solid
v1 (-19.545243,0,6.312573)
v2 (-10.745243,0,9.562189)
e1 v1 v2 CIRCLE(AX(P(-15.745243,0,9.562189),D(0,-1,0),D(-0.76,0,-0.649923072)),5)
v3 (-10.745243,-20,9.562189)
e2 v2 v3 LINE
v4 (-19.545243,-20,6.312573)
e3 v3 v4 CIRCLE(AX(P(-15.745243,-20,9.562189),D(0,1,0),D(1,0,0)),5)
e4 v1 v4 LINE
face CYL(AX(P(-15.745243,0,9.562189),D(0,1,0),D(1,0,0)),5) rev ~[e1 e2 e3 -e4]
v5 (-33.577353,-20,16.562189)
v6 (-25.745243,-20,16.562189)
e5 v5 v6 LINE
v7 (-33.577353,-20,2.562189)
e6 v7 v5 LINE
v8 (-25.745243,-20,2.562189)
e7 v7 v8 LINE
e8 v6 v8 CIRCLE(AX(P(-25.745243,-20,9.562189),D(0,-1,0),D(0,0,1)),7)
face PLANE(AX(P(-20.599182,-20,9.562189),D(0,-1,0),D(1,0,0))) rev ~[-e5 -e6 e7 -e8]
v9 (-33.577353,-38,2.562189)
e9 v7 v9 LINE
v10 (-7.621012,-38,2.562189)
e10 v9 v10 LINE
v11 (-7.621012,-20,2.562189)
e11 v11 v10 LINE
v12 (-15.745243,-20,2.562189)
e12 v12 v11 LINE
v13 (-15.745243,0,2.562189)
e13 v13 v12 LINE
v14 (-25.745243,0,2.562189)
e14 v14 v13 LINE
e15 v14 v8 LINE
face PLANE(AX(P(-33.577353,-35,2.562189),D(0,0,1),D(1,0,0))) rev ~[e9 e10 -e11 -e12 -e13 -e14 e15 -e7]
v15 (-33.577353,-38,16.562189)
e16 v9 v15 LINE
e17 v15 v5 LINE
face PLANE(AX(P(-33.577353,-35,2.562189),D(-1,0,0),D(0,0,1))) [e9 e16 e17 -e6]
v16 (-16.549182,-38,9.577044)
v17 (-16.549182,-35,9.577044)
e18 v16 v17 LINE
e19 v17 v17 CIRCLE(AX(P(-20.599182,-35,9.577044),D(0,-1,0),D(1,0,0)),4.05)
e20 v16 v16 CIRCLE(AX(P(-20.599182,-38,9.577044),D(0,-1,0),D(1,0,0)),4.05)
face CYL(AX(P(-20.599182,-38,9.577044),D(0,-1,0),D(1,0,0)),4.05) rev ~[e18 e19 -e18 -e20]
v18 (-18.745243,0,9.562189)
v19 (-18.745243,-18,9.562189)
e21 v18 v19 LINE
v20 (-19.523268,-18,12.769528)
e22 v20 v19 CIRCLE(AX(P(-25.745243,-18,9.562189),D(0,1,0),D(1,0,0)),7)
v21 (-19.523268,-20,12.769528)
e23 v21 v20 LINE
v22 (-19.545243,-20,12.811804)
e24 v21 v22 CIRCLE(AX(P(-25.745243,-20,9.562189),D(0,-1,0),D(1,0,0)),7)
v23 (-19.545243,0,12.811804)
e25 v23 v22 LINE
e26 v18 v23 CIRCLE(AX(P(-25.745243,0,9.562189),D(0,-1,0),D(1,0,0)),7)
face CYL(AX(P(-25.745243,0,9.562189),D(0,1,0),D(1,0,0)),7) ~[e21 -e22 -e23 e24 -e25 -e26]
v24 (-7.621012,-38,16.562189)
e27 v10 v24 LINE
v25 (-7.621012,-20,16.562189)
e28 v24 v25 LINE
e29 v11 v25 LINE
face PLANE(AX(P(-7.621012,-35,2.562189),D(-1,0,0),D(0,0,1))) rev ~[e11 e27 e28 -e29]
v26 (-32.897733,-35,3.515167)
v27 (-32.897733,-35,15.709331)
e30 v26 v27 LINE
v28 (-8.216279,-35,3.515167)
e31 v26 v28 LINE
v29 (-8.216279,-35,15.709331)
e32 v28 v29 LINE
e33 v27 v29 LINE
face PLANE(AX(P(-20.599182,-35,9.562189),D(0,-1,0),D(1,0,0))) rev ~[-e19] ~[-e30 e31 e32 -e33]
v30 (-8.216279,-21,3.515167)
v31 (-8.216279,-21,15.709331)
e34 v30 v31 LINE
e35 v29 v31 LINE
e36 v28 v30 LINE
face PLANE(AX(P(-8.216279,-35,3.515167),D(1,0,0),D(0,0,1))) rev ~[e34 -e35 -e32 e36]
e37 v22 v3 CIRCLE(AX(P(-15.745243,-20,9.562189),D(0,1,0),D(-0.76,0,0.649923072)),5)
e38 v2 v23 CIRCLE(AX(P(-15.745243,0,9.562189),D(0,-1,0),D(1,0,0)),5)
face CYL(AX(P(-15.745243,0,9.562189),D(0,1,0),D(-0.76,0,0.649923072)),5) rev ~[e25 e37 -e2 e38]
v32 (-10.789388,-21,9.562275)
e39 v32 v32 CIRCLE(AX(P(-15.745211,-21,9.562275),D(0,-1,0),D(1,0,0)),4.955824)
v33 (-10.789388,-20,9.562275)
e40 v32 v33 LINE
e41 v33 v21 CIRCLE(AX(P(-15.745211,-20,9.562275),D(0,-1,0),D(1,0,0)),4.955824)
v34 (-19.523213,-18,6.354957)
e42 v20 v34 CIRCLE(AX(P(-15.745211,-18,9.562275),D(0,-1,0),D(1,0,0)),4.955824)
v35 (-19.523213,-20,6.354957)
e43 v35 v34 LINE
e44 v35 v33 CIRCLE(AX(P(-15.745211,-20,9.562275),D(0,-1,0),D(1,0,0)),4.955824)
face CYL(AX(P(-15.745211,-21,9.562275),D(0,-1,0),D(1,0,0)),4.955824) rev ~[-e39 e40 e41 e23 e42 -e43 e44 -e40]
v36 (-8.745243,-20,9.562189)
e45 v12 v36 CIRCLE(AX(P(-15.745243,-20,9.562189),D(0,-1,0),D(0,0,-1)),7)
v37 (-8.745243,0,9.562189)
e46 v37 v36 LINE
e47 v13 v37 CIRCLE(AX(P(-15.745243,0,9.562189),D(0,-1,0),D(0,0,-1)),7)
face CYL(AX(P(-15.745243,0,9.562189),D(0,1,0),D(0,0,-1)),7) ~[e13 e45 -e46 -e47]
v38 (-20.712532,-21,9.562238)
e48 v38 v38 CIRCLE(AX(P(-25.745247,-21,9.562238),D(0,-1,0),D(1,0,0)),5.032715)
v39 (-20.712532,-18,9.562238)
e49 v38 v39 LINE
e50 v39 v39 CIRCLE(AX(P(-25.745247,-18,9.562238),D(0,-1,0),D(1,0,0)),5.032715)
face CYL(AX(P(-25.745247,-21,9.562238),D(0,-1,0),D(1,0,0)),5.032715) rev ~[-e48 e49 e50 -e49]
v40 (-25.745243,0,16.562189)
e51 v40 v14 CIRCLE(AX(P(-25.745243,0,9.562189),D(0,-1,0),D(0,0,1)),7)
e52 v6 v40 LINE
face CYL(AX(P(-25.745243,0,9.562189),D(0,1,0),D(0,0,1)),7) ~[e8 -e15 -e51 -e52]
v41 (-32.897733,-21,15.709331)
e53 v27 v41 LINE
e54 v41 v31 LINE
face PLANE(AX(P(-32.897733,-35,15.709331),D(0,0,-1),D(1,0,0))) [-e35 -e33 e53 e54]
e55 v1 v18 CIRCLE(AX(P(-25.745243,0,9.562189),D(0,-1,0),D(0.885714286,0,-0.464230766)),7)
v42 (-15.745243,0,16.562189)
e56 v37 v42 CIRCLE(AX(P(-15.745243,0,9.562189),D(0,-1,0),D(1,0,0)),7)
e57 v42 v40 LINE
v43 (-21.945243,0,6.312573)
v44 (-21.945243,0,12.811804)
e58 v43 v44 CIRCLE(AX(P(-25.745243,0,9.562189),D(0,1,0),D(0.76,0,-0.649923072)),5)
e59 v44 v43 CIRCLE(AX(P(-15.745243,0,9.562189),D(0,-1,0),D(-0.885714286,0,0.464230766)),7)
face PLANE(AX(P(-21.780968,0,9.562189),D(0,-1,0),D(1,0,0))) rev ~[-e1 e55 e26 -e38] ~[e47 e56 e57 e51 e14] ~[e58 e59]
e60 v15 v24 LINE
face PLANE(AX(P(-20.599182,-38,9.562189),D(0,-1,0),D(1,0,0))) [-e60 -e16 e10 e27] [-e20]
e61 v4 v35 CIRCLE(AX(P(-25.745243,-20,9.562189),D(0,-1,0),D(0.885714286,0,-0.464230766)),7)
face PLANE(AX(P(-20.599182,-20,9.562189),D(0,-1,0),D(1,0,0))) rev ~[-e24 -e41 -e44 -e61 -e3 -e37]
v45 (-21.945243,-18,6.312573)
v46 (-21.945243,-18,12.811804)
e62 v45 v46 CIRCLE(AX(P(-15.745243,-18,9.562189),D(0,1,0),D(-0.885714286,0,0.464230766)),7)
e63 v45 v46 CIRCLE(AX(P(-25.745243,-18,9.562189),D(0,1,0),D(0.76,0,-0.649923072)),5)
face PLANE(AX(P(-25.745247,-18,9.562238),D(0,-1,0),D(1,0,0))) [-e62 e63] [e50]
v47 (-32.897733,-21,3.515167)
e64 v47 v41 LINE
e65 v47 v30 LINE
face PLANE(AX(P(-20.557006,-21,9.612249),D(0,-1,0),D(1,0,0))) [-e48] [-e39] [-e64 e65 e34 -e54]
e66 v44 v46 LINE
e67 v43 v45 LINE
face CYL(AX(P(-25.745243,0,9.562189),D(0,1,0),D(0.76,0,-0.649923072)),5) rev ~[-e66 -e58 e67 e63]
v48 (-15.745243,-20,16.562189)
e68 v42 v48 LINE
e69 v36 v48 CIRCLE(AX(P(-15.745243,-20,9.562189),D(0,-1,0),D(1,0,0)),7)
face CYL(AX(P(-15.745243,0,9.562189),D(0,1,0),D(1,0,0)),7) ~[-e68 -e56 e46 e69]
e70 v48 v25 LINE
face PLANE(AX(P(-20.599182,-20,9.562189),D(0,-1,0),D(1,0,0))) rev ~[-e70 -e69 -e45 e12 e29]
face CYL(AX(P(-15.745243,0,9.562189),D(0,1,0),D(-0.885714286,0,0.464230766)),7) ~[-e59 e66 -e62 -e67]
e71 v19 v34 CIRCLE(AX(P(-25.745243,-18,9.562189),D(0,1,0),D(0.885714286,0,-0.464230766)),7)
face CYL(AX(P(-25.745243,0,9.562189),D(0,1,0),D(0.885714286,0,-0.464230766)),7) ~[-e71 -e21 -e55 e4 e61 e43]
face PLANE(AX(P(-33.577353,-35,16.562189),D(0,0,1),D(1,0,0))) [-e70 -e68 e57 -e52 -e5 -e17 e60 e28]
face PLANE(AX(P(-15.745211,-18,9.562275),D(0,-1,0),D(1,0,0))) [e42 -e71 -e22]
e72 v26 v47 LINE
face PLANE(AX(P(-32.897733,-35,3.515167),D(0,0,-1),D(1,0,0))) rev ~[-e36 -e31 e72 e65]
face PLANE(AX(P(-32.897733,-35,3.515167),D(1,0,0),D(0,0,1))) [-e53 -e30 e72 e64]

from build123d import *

# Parameters (mm, degrees)
F1_DEPTH  = 13
F2_R      = 6.8523627272
F3_DEPTH  = 30
F4_DEPTH  = 20
F5_W      = 25.9563405998
F5_H      = 14
F6_DEPTH  = 15
F7_W      = 24.6814545244
F7_H      = 12.1941640973
F8_DEPTH  = 14
F9_R      = 5.0327145122
F9_R_2    = 4.9558235457
F10_DEPTH = 3
F11_W     = 25.9563405998
F11_H     = 14
F12_DEPTH = 3
F13_R     = 4.05
F14_DEPTH = 5


with BuildPart() as f1:
    # F0 (on Front) → F1 (new body)
    with BuildSketch(Plane.XZ):
        with BuildLine():
            ThreePointArc((-21.9452433995, 6.3125732282), (-30.7452433995, 9.5621885901), (-21.9452433995, 12.8118039519))
            ThreePointArc((-21.9452433995, 12.8118039519), (-21.4056409565, 13.6804284443), (-20.7452433995, 14.4611680756))
            ThreePointArc((-20.7452433995, 14.4611680756), (-23.0334963979, 16.0155929784), (-25.7452433995, 16.5621885901))
            ThreePointArc((-25.7452433995, 16.5621885901), (-32.7452433995, 9.5621885901), (-25.7452433995, 2.5621885901))
            ThreePointArc((-25.7452433995, 2.5621885901), (-23.0334963979, 3.1087842017), (-20.7452433995, 4.6632091045))
            ThreePointArc((-20.7452433995, 4.6632091045), (-21.4056409565, 5.4439487359), (-21.9452433995, 6.3125732282))
        make_face()
        with BuildLine():
            ThreePointArc((-20.7452433995, 14.4611680756), (-20.0848458425, 13.6804284443), (-19.5452433995, 12.8118039519))
            ThreePointArc((-19.5452433995, 12.8118039519), (-14.0131925919, 14.2526043499), (-10.7452433995, 9.5621885901))
            ThreePointArc((-10.7452433995, 9.5621885901), (-14.0131925919, 4.8717728303), (-19.5452433995, 6.3125732282))
            ThreePointArc((-19.5452433995, 6.3125732282), (-20.0848458425, 5.4439487359), (-20.7452433995, 4.6632091045))
            ThreePointArc((-20.7452433995, 4.6632091045), (-18.4569904011, 3.1087842017), (-15.7452433995, 2.5621885901))
            ThreePointArc((-15.7452433995, 2.5621885901), (-10.7954959312, 4.6124411218), (-8.7452433995, 9.5621885901))
            ThreePointArc((-8.7452433995, 9.5621885901), (-10.7954959312, 14.5119360584), (-15.7452433995, 16.5621885901))
            ThreePointArc((-15.7452433995, 16.5621885901), (-18.4569904011, 16.0155929784), (-20.7452433995, 14.4611680756))
        make_face()
        with BuildLine():
            ThreePointArc((-25.7452433995, 16.5621885901), (-23.0334963979, 16.0155929784), (-20.7452433995, 14.4611680756))
            ThreePointArc((-20.7452433995, 14.4611680756), (-18.4569904011, 16.0155929784), (-15.7452433995, 16.5621885901))
            Line((-15.7452433995, 16.5621885901), (-25.7452433995, 16.5621885901))
        make_face()
        with BuildLine():
            ThreePointArc((-15.7452433995, 2.5621885901), (-18.4569904011, 3.1087842017), (-20.7452433995, 4.6632091045))
            ThreePointArc((-20.7452433995, 4.6632091045), (-23.0334963979, 3.1087842017), (-25.7452433995, 2.5621885901))
            Line((-25.7452433995, 2.5621885901), (-15.7452433995, 2.5621885901))
        make_face()
    extrude(amount=F1_DEPTH)

    # F2 (on face) → F3 (cut)
    with BuildSketch(Plane.XZ.offset(13)):
        with Locations((-20.7452433995, 9.5621885901)):
            Circle(F2_R)
    extrude(amount=-F3_DEPTH, mode=Mode.SUBTRACT)

    # F0 (on Front) → F4 (join)
    with BuildSketch(Plane.XZ):
        with BuildLine():
            ThreePointArc((-21.9452433995, 6.3125732282), (-21.0548276397, 7.8301377825), (-20.7452433995, 9.5621885901))
            ThreePointArc((-20.7452433995, 9.5621885901), (-21.0548276397, 11.2942393976), (-21.9452433995, 12.8118039519))
            ThreePointArc((-21.9452433995, 12.8118039519), (-22.7452433995, 9.5621885901), (-21.9452433995, 6.3125732282))
        make_face()
        with BuildLine():
            ThreePointArc((-19.5452433995, 6.3125732282), (-20.4356591593, 7.8301377825), (-20.7452433995, 9.5621885901))
            ThreePointArc((-20.7452433995, 9.5621885901), (-21.0548276397, 7.8301377825), (-21.9452433995, 6.3125732282))
            ThreePointArc((-21.9452433995, 6.3125732282), (-21.4056409565, 5.4439487359), (-20.7452433995, 4.6632091045))
            ThreePointArc((-20.7452433995, 4.6632091045), (-20.0848458425, 5.4439487359), (-19.5452433995, 6.3125732282))
        make_face()
        with BuildLine():
            ThreePointArc((-21.9452433995, 12.8118039519), (-21.0548276397, 11.2942393976), (-20.7452433995, 9.5621885901))
            ThreePointArc((-20.7452433995, 9.5621885901), (-20.4356591593, 11.2942393976), (-19.5452433995, 12.8118039519))
            ThreePointArc((-19.5452433995, 12.8118039519), (-20.0848458425, 13.6804284443), (-20.7452433995, 14.4611680756))
            ThreePointArc((-20.7452433995, 14.4611680756), (-21.4056409565, 13.6804284443), (-21.9452433995, 12.8118039519))
        make_face()
        with BuildLine():
            ThreePointArc((-19.5452433995, 12.8118039519), (-20.4356591593, 11.2942393976), (-20.7452433995, 9.5621885901))
            ThreePointArc((-20.7452433995, 9.5621885901), (-20.4356591593, 7.8301377825), (-19.5452433995, 6.3125732282))
            ThreePointArc((-19.5452433995, 6.3125732282), (-18.9481852123, 7.888868537), (-18.7452433995, 9.5621885901))
            ThreePointArc((-18.7452433995, 9.5621885901), (-18.9481852123, 11.2355086431), (-19.5452433995, 12.8118039519))
        make_face()
        with BuildLine():
            ThreePointArc((-21.9452433995, 6.3125732282), (-30.7452433995, 9.5621885901), (-21.9452433995, 12.8118039519))
            ThreePointArc((-21.9452433995, 12.8118039519), (-21.4056409565, 13.6804284443), (-20.7452433995, 14.4611680756))
            ThreePointArc((-20.7452433995, 14.4611680756), (-23.0334963979, 16.0155929784), (-25.7452433995, 16.5621885901))
            ThreePointArc((-25.7452433995, 16.5621885901), (-32.7452433995, 9.5621885901), (-25.7452433995, 2.5621885901))
            ThreePointArc((-25.7452433995, 2.5621885901), (-23.0334963979, 3.1087842017), (-20.7452433995, 4.6632091045))
            ThreePointArc((-20.7452433995, 4.6632091045), (-21.4056409565, 5.4439487359), (-21.9452433995, 6.3125732282))
        make_face()
        with BuildLine():
            ThreePointArc((-20.7452433995, 14.4611680756), (-20.0848458425, 13.6804284443), (-19.5452433995, 12.8118039519))
            ThreePointArc((-19.5452433995, 12.8118039519), (-14.0131925919, 14.2526043499), (-10.7452433995, 9.5621885901))
            ThreePointArc((-10.7452433995, 9.5621885901), (-14.0131925919, 4.8717728303), (-19.5452433995, 6.3125732282))
            ThreePointArc((-19.5452433995, 6.3125732282), (-20.0848458425, 5.4439487359), (-20.7452433995, 4.6632091045))
            ThreePointArc((-20.7452433995, 4.6632091045), (-18.4569904011, 3.1087842017), (-15.7452433995, 2.5621885901))
            ThreePointArc((-15.7452433995, 2.5621885901), (-10.7954959312, 4.6124411218), (-8.7452433995, 9.5621885901))
            ThreePointArc((-8.7452433995, 9.5621885901), (-10.7954959312, 14.5119360584), (-15.7452433995, 16.5621885901))
            ThreePointArc((-15.7452433995, 16.5621885901), (-18.4569904011, 16.0155929784), (-20.7452433995, 14.4611680756))
        make_face()
        with BuildLine():
            ThreePointArc((-25.7452433995, 16.5621885901), (-23.0334963979, 16.0155929784), (-20.7452433995, 14.4611680756))
            ThreePointArc((-20.7452433995, 14.4611680756), (-18.4569904011, 16.0155929784), (-15.7452433995, 16.5621885901))
            Line((-15.7452433995, 16.5621885901), (-25.7452433995, 16.5621885901))
        make_face()
        with BuildLine():
            ThreePointArc((-15.7452433995, 2.5621885901), (-18.4569904011, 3.1087842017), (-20.7452433995, 4.6632091045))
            ThreePointArc((-20.7452433995, 4.6632091045), (-23.0334963979, 3.1087842017), (-25.7452433995, 2.5621885901))
            Line((-25.7452433995, 2.5621885901), (-15.7452433995, 2.5621885901))
        make_face()
    extrude(amount=F4_DEPTH)

    # F5 (on face) → F6 (join)
    with BuildSketch(Plane.XZ.offset(20)):
        with Locations((-20.5991824623, 9.5621885901)):
            Rectangle(F5_W, F5_H)
    extrude(amount=F6_DEPTH)

    # F7 (on face) → F8 (cut)
    with BuildSketch(Plane.XZ.offset(35)):
        with Locations((-20.5570058897, 9.6122492105)):
            Rectangle(F7_W, F7_H)
    extrude(amount=-F8_DEPTH, mode=Mode.SUBTRACT)

    # F9 (on face) → F10 (cut)
    with BuildSketch(Plane.XZ.offset(21)):
        with Locations((-25.7452465594, 9.5622381195)):
            Circle(F9_R)
        with Locations((-15.7452113926, 9.5622753724)):
            Circle(F9_R_2)
    extrude(amount=-F10_DEPTH, mode=Mode.SUBTRACT)

    # F11 (on face) → F12 (join)
    with BuildSketch(Plane.XZ.offset(35)):
        with Locations((-20.5991824623, 9.5621885901)):
            Rectangle(F11_W, F11_H)
    extrude(amount=F12_DEPTH)

    # F13 (on face) → F14 (cut)
    with BuildSketch(Plane.XZ.offset(38)):
        with Locations((-20.5991824623, 9.5770442858)):
            Circle(F13_R)
    extrude(amount=-F14_DEPTH, mode=Mode.SUBTRACT)


solid = f1.part
